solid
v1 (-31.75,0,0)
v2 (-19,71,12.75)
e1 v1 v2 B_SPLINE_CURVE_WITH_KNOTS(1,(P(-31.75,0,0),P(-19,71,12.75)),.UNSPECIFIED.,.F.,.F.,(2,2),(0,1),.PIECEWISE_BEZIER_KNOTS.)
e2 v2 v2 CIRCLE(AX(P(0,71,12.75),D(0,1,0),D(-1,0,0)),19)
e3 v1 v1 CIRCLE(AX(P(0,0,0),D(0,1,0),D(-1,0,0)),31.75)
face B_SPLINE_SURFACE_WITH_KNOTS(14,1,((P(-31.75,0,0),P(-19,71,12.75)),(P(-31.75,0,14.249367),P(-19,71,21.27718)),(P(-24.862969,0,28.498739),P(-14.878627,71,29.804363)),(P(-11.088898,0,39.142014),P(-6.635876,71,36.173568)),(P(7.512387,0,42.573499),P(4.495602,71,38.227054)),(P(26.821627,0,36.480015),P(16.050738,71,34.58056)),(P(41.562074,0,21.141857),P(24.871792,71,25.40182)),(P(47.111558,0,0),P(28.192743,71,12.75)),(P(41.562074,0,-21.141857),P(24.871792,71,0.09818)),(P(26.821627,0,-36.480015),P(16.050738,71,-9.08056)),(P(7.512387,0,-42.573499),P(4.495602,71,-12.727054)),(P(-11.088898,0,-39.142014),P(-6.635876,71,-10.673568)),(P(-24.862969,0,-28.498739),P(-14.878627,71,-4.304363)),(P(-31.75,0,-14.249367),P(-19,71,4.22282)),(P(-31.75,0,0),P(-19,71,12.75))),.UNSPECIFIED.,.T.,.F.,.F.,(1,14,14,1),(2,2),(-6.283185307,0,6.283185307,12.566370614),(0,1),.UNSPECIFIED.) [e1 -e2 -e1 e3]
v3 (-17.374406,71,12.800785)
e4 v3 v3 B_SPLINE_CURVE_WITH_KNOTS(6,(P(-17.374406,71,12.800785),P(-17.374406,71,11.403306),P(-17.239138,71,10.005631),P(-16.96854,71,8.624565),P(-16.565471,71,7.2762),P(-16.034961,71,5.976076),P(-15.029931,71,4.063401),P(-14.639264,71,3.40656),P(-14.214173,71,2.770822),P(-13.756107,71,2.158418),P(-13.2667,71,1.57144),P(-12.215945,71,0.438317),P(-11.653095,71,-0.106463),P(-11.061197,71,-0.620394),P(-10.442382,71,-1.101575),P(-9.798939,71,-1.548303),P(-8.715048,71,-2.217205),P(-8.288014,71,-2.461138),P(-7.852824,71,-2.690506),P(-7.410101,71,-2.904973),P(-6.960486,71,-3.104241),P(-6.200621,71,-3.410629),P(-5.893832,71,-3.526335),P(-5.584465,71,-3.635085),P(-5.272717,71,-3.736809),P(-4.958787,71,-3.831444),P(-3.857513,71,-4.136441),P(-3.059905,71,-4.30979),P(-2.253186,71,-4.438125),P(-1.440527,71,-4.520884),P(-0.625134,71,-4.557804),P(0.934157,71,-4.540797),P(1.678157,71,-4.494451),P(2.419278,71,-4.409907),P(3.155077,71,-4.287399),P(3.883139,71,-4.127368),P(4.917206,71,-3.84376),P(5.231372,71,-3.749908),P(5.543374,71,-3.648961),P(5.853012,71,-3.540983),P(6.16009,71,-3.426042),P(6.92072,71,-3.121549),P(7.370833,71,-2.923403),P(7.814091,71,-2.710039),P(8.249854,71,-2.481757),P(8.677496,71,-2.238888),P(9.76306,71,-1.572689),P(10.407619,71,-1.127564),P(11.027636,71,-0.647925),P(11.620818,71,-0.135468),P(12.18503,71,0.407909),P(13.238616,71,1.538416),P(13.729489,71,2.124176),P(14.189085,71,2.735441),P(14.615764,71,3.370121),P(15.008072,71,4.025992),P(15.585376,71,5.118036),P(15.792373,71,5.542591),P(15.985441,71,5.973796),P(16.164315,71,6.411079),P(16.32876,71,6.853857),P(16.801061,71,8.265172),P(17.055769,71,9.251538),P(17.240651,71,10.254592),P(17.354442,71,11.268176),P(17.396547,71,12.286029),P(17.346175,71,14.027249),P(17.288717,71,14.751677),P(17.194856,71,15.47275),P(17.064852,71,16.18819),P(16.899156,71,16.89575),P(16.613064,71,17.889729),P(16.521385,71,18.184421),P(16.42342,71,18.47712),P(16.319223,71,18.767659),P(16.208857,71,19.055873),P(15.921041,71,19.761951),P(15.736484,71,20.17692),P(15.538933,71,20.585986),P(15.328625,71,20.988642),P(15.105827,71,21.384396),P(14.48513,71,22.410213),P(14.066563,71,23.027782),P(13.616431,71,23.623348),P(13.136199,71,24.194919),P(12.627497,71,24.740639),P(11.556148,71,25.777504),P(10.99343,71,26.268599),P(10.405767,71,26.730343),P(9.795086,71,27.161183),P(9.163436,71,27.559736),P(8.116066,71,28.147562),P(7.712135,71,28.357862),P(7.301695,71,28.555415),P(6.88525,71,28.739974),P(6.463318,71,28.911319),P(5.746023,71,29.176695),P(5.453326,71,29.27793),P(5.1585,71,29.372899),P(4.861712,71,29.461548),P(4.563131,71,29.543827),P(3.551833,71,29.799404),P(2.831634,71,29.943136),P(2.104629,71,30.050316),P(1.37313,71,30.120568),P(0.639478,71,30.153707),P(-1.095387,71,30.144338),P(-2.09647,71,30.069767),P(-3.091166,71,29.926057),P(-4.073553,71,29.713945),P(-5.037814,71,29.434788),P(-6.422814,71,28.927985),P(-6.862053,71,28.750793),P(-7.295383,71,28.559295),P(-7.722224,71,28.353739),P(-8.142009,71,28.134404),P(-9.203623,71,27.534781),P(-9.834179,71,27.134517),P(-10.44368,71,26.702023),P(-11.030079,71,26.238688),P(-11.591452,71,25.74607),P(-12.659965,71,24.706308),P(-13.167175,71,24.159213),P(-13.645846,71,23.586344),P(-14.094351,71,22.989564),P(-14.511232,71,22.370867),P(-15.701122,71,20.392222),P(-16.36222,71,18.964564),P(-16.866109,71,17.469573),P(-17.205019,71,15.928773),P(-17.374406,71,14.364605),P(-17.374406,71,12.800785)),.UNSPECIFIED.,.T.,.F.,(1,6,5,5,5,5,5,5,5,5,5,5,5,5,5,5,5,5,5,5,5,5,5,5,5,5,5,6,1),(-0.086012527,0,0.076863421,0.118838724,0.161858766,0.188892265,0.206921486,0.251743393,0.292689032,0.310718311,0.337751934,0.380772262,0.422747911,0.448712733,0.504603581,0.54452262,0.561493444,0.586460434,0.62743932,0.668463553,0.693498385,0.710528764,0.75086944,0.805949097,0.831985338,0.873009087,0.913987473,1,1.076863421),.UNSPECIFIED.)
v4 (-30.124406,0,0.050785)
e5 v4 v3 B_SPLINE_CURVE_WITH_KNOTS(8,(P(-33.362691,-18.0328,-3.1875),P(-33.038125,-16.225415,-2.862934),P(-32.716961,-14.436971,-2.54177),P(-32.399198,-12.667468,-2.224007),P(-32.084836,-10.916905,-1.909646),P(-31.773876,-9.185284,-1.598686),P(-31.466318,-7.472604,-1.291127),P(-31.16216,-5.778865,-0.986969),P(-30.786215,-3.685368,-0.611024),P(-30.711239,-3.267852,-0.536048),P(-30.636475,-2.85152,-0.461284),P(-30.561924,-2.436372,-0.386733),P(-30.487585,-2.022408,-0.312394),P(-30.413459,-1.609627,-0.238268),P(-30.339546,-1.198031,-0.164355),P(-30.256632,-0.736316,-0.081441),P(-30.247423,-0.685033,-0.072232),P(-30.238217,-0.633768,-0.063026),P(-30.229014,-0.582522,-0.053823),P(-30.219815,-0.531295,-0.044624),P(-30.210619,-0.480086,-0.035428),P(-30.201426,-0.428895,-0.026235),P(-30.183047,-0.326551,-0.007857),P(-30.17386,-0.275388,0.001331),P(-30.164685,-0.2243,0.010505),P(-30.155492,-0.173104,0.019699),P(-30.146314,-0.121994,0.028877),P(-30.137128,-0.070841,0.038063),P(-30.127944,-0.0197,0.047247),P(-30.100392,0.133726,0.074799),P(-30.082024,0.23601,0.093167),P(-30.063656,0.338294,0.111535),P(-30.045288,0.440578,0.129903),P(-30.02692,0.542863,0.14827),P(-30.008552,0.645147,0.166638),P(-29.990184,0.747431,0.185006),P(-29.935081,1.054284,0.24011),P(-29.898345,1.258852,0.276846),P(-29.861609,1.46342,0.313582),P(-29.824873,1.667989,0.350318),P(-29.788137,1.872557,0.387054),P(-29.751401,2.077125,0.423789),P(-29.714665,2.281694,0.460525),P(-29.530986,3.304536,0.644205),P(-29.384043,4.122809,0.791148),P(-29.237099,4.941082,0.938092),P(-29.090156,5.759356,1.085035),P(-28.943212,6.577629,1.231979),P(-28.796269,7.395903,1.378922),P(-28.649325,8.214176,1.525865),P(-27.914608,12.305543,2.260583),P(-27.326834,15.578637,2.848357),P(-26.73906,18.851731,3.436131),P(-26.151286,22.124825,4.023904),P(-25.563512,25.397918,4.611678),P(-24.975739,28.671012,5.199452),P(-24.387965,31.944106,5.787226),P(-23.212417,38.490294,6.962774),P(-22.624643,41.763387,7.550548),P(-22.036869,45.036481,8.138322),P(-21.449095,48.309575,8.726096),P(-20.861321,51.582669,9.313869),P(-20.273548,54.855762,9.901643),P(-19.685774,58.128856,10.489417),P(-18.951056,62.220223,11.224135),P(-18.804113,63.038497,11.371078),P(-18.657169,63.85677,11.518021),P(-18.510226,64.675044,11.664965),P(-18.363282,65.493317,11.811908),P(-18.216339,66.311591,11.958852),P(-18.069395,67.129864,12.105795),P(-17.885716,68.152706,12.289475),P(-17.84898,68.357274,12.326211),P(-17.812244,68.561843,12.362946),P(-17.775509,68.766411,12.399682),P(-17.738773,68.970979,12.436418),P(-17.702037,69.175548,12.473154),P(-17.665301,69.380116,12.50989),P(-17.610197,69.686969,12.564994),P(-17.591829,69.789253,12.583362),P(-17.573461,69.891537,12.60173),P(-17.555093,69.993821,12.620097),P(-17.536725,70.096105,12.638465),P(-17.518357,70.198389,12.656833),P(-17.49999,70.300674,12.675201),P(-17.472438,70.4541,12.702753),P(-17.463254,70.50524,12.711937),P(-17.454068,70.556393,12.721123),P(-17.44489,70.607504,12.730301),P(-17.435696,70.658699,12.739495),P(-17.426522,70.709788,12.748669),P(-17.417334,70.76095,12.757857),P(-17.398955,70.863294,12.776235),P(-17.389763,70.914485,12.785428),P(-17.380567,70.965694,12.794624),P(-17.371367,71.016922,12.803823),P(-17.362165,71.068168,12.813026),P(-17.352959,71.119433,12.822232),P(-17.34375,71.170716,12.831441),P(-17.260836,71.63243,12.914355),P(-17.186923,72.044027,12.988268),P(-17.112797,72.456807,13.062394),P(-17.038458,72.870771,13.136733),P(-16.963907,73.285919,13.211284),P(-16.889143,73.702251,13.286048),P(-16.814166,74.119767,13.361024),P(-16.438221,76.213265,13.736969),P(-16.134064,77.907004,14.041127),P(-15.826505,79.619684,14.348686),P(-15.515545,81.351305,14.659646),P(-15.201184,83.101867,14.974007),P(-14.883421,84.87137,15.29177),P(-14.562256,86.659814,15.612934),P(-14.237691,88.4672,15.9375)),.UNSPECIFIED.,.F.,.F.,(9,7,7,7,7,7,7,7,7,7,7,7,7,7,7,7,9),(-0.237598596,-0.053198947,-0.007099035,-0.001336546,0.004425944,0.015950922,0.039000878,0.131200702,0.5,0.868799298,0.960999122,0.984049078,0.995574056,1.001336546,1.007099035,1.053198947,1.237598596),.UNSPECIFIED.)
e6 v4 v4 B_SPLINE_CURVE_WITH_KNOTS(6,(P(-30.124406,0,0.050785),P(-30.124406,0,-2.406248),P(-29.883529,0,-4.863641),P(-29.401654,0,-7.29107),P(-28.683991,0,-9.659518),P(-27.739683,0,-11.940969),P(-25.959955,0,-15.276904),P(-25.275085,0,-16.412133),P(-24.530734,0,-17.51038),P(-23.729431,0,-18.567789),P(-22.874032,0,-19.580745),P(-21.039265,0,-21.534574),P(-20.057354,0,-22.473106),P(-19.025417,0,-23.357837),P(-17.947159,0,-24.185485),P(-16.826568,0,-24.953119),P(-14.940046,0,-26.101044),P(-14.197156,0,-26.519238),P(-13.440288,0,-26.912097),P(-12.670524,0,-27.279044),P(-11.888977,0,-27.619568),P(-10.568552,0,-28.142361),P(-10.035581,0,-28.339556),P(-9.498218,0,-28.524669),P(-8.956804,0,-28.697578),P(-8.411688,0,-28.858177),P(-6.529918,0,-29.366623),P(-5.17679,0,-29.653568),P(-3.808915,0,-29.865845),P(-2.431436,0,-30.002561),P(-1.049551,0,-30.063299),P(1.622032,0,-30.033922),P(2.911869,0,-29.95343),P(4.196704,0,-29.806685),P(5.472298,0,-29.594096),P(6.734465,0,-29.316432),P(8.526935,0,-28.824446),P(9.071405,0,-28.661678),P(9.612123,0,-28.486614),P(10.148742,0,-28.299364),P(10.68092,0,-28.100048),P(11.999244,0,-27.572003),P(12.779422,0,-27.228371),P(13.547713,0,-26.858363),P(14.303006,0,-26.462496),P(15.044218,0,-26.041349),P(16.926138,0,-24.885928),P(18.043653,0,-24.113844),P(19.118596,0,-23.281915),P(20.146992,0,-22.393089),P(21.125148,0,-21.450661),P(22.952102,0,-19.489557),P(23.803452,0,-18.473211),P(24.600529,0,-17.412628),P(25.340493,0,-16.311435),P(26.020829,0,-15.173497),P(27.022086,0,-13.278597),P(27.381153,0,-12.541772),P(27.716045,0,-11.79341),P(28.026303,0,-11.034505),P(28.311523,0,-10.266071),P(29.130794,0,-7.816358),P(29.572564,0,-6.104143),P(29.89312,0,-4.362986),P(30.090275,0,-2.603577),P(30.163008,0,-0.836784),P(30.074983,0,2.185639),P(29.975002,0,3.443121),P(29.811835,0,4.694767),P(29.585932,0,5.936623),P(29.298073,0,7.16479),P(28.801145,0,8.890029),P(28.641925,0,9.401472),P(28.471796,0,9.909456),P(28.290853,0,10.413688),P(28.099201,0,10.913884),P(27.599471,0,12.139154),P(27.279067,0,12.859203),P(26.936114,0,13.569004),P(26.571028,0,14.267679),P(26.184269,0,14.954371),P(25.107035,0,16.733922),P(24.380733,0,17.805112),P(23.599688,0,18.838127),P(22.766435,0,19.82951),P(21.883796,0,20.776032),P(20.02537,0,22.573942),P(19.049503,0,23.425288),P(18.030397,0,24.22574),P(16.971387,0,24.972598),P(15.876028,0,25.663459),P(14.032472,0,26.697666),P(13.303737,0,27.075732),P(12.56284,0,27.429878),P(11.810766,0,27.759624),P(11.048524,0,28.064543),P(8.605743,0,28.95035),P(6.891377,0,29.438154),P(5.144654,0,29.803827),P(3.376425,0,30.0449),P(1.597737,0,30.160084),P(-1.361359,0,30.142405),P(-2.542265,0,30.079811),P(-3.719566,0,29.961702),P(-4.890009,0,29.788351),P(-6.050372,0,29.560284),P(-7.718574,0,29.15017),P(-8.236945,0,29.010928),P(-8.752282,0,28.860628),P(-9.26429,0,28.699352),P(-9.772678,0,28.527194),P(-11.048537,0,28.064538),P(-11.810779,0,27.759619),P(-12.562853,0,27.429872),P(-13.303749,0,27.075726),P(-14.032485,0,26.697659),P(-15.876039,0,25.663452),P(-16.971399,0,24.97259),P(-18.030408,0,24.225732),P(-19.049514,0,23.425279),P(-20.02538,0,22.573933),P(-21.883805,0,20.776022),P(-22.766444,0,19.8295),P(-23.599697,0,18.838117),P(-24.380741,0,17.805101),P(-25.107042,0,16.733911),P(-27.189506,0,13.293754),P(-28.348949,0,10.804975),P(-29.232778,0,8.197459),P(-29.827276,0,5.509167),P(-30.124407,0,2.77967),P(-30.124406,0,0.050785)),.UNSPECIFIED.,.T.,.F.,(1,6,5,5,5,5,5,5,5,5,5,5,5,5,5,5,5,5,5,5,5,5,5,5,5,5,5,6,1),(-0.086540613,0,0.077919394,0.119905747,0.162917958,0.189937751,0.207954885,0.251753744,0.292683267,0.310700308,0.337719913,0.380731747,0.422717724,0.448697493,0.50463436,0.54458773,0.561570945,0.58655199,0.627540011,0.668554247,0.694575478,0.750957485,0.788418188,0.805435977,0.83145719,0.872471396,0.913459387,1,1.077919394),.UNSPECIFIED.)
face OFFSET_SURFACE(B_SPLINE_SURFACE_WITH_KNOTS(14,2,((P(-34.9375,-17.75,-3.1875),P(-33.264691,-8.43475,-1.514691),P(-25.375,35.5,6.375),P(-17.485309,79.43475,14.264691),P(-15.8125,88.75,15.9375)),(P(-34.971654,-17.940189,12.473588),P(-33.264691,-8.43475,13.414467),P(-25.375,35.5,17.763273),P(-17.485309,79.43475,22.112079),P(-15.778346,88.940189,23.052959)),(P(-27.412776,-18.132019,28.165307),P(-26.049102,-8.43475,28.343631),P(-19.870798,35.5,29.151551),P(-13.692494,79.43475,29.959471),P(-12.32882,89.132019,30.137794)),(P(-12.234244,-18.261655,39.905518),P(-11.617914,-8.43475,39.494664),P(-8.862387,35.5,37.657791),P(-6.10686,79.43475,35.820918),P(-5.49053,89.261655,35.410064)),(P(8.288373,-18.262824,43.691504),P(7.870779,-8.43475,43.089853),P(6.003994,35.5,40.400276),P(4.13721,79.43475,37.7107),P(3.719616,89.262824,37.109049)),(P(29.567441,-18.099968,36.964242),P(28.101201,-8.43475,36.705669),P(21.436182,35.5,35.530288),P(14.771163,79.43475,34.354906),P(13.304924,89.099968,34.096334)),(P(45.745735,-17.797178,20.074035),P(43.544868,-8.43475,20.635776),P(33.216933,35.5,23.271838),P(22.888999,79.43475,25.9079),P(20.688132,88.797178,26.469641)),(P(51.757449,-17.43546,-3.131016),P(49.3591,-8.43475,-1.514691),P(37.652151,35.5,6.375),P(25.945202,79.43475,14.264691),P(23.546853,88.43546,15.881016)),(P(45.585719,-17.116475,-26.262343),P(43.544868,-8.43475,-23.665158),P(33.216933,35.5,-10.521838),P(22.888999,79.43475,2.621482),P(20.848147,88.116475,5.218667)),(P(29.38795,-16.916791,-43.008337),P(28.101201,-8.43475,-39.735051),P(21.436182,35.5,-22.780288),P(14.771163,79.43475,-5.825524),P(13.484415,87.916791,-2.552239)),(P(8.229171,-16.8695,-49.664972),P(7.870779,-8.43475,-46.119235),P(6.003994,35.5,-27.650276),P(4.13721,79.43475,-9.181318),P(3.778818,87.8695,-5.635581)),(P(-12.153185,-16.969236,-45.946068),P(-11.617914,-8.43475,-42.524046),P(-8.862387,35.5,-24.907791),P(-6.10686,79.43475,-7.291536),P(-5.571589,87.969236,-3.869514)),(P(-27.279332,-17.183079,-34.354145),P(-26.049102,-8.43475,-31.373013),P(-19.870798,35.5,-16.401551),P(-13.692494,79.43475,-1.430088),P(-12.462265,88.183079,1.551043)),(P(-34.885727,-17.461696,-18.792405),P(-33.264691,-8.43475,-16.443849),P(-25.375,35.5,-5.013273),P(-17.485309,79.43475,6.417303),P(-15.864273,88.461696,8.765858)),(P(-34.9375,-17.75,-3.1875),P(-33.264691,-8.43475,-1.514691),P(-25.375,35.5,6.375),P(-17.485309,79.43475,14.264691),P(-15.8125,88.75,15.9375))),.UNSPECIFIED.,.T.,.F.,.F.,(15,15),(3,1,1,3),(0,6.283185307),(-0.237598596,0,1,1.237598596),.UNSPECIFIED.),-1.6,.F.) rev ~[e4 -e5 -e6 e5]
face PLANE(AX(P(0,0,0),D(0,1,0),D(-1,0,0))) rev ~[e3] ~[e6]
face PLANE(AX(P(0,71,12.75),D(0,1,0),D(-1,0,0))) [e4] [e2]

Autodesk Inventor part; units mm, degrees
ref_plane "YZ Plane" through (0, 0, 0) normal (1, 0, 0) x (0, 1, 0)
ref_plane "XY Plane" through (0, 0, 0) normal (0, 0, 1) x (1, 0, 0)
sketch "Szkic6" plane through (0, 0, 0) normal (0, 1, 0) x (-1, 0, 0)
  circle A0 centre (0, 0) radius 31.75
  dimension "d33" = 63.5
ref_plane "Płaszczyzna konstrukcyjna1" through (0, 71, 0) normal (0, 1, 0) x (-1, 0, 0)
sketch "Szkic7" plane through (0, 71, 0) normal (0, 1, 0) x (-1, 0, 0)
  circle A0 centre (0, 12.75) radius 19
  line L0 (0, -20.3) -> (0, 20.3) construction
  circle A1 centre (0, 0) radius 31.75 construction
  dimension "d35" = 38
loft "Wyciągnięcie złożone1" add profiles "Szkic6", "Szkic7"
shell "Skorupa1" thickness 1.6 removed faces 2 at (-4.1255, 71, 9.4414) at (14.3997, 0, 5.5289)
equation "\"d33\" = OD1"
equation "\"d35\" = OD2"
equation "\"d52\" = THK"
equation "\"SzerokośćGięciaPodcięcia\" = Grubość"
equation "\"RozmiarPodcięciaNarożnika\" = 4 * Grubość"
equation "\"PromieńPrzejścia\" = PromieńGięcia"
equation "\"Rozmiar_promienia_Jacobiego\" = PromieńGięcia"
equation "\"Wielk_odstępu\" = Grubość"
equation "\"d2\" = PromieńGięcia"
equation "\"d23\" = PromieńGięcia"
equation "\"OD1\" = 63.5"
equation "\"OD2\" = 38"
equation "\"L\" = 71"
equation "\"THK\" = 1.6"
equation "\"d34\" = L"
equation "\"Grubość\" = 1.5"
equation "\"PromieńGięcia\" = 3"
properties part number "Redukcja asymetryczna Ø63,5x38x1,6 L=71" material "304"
